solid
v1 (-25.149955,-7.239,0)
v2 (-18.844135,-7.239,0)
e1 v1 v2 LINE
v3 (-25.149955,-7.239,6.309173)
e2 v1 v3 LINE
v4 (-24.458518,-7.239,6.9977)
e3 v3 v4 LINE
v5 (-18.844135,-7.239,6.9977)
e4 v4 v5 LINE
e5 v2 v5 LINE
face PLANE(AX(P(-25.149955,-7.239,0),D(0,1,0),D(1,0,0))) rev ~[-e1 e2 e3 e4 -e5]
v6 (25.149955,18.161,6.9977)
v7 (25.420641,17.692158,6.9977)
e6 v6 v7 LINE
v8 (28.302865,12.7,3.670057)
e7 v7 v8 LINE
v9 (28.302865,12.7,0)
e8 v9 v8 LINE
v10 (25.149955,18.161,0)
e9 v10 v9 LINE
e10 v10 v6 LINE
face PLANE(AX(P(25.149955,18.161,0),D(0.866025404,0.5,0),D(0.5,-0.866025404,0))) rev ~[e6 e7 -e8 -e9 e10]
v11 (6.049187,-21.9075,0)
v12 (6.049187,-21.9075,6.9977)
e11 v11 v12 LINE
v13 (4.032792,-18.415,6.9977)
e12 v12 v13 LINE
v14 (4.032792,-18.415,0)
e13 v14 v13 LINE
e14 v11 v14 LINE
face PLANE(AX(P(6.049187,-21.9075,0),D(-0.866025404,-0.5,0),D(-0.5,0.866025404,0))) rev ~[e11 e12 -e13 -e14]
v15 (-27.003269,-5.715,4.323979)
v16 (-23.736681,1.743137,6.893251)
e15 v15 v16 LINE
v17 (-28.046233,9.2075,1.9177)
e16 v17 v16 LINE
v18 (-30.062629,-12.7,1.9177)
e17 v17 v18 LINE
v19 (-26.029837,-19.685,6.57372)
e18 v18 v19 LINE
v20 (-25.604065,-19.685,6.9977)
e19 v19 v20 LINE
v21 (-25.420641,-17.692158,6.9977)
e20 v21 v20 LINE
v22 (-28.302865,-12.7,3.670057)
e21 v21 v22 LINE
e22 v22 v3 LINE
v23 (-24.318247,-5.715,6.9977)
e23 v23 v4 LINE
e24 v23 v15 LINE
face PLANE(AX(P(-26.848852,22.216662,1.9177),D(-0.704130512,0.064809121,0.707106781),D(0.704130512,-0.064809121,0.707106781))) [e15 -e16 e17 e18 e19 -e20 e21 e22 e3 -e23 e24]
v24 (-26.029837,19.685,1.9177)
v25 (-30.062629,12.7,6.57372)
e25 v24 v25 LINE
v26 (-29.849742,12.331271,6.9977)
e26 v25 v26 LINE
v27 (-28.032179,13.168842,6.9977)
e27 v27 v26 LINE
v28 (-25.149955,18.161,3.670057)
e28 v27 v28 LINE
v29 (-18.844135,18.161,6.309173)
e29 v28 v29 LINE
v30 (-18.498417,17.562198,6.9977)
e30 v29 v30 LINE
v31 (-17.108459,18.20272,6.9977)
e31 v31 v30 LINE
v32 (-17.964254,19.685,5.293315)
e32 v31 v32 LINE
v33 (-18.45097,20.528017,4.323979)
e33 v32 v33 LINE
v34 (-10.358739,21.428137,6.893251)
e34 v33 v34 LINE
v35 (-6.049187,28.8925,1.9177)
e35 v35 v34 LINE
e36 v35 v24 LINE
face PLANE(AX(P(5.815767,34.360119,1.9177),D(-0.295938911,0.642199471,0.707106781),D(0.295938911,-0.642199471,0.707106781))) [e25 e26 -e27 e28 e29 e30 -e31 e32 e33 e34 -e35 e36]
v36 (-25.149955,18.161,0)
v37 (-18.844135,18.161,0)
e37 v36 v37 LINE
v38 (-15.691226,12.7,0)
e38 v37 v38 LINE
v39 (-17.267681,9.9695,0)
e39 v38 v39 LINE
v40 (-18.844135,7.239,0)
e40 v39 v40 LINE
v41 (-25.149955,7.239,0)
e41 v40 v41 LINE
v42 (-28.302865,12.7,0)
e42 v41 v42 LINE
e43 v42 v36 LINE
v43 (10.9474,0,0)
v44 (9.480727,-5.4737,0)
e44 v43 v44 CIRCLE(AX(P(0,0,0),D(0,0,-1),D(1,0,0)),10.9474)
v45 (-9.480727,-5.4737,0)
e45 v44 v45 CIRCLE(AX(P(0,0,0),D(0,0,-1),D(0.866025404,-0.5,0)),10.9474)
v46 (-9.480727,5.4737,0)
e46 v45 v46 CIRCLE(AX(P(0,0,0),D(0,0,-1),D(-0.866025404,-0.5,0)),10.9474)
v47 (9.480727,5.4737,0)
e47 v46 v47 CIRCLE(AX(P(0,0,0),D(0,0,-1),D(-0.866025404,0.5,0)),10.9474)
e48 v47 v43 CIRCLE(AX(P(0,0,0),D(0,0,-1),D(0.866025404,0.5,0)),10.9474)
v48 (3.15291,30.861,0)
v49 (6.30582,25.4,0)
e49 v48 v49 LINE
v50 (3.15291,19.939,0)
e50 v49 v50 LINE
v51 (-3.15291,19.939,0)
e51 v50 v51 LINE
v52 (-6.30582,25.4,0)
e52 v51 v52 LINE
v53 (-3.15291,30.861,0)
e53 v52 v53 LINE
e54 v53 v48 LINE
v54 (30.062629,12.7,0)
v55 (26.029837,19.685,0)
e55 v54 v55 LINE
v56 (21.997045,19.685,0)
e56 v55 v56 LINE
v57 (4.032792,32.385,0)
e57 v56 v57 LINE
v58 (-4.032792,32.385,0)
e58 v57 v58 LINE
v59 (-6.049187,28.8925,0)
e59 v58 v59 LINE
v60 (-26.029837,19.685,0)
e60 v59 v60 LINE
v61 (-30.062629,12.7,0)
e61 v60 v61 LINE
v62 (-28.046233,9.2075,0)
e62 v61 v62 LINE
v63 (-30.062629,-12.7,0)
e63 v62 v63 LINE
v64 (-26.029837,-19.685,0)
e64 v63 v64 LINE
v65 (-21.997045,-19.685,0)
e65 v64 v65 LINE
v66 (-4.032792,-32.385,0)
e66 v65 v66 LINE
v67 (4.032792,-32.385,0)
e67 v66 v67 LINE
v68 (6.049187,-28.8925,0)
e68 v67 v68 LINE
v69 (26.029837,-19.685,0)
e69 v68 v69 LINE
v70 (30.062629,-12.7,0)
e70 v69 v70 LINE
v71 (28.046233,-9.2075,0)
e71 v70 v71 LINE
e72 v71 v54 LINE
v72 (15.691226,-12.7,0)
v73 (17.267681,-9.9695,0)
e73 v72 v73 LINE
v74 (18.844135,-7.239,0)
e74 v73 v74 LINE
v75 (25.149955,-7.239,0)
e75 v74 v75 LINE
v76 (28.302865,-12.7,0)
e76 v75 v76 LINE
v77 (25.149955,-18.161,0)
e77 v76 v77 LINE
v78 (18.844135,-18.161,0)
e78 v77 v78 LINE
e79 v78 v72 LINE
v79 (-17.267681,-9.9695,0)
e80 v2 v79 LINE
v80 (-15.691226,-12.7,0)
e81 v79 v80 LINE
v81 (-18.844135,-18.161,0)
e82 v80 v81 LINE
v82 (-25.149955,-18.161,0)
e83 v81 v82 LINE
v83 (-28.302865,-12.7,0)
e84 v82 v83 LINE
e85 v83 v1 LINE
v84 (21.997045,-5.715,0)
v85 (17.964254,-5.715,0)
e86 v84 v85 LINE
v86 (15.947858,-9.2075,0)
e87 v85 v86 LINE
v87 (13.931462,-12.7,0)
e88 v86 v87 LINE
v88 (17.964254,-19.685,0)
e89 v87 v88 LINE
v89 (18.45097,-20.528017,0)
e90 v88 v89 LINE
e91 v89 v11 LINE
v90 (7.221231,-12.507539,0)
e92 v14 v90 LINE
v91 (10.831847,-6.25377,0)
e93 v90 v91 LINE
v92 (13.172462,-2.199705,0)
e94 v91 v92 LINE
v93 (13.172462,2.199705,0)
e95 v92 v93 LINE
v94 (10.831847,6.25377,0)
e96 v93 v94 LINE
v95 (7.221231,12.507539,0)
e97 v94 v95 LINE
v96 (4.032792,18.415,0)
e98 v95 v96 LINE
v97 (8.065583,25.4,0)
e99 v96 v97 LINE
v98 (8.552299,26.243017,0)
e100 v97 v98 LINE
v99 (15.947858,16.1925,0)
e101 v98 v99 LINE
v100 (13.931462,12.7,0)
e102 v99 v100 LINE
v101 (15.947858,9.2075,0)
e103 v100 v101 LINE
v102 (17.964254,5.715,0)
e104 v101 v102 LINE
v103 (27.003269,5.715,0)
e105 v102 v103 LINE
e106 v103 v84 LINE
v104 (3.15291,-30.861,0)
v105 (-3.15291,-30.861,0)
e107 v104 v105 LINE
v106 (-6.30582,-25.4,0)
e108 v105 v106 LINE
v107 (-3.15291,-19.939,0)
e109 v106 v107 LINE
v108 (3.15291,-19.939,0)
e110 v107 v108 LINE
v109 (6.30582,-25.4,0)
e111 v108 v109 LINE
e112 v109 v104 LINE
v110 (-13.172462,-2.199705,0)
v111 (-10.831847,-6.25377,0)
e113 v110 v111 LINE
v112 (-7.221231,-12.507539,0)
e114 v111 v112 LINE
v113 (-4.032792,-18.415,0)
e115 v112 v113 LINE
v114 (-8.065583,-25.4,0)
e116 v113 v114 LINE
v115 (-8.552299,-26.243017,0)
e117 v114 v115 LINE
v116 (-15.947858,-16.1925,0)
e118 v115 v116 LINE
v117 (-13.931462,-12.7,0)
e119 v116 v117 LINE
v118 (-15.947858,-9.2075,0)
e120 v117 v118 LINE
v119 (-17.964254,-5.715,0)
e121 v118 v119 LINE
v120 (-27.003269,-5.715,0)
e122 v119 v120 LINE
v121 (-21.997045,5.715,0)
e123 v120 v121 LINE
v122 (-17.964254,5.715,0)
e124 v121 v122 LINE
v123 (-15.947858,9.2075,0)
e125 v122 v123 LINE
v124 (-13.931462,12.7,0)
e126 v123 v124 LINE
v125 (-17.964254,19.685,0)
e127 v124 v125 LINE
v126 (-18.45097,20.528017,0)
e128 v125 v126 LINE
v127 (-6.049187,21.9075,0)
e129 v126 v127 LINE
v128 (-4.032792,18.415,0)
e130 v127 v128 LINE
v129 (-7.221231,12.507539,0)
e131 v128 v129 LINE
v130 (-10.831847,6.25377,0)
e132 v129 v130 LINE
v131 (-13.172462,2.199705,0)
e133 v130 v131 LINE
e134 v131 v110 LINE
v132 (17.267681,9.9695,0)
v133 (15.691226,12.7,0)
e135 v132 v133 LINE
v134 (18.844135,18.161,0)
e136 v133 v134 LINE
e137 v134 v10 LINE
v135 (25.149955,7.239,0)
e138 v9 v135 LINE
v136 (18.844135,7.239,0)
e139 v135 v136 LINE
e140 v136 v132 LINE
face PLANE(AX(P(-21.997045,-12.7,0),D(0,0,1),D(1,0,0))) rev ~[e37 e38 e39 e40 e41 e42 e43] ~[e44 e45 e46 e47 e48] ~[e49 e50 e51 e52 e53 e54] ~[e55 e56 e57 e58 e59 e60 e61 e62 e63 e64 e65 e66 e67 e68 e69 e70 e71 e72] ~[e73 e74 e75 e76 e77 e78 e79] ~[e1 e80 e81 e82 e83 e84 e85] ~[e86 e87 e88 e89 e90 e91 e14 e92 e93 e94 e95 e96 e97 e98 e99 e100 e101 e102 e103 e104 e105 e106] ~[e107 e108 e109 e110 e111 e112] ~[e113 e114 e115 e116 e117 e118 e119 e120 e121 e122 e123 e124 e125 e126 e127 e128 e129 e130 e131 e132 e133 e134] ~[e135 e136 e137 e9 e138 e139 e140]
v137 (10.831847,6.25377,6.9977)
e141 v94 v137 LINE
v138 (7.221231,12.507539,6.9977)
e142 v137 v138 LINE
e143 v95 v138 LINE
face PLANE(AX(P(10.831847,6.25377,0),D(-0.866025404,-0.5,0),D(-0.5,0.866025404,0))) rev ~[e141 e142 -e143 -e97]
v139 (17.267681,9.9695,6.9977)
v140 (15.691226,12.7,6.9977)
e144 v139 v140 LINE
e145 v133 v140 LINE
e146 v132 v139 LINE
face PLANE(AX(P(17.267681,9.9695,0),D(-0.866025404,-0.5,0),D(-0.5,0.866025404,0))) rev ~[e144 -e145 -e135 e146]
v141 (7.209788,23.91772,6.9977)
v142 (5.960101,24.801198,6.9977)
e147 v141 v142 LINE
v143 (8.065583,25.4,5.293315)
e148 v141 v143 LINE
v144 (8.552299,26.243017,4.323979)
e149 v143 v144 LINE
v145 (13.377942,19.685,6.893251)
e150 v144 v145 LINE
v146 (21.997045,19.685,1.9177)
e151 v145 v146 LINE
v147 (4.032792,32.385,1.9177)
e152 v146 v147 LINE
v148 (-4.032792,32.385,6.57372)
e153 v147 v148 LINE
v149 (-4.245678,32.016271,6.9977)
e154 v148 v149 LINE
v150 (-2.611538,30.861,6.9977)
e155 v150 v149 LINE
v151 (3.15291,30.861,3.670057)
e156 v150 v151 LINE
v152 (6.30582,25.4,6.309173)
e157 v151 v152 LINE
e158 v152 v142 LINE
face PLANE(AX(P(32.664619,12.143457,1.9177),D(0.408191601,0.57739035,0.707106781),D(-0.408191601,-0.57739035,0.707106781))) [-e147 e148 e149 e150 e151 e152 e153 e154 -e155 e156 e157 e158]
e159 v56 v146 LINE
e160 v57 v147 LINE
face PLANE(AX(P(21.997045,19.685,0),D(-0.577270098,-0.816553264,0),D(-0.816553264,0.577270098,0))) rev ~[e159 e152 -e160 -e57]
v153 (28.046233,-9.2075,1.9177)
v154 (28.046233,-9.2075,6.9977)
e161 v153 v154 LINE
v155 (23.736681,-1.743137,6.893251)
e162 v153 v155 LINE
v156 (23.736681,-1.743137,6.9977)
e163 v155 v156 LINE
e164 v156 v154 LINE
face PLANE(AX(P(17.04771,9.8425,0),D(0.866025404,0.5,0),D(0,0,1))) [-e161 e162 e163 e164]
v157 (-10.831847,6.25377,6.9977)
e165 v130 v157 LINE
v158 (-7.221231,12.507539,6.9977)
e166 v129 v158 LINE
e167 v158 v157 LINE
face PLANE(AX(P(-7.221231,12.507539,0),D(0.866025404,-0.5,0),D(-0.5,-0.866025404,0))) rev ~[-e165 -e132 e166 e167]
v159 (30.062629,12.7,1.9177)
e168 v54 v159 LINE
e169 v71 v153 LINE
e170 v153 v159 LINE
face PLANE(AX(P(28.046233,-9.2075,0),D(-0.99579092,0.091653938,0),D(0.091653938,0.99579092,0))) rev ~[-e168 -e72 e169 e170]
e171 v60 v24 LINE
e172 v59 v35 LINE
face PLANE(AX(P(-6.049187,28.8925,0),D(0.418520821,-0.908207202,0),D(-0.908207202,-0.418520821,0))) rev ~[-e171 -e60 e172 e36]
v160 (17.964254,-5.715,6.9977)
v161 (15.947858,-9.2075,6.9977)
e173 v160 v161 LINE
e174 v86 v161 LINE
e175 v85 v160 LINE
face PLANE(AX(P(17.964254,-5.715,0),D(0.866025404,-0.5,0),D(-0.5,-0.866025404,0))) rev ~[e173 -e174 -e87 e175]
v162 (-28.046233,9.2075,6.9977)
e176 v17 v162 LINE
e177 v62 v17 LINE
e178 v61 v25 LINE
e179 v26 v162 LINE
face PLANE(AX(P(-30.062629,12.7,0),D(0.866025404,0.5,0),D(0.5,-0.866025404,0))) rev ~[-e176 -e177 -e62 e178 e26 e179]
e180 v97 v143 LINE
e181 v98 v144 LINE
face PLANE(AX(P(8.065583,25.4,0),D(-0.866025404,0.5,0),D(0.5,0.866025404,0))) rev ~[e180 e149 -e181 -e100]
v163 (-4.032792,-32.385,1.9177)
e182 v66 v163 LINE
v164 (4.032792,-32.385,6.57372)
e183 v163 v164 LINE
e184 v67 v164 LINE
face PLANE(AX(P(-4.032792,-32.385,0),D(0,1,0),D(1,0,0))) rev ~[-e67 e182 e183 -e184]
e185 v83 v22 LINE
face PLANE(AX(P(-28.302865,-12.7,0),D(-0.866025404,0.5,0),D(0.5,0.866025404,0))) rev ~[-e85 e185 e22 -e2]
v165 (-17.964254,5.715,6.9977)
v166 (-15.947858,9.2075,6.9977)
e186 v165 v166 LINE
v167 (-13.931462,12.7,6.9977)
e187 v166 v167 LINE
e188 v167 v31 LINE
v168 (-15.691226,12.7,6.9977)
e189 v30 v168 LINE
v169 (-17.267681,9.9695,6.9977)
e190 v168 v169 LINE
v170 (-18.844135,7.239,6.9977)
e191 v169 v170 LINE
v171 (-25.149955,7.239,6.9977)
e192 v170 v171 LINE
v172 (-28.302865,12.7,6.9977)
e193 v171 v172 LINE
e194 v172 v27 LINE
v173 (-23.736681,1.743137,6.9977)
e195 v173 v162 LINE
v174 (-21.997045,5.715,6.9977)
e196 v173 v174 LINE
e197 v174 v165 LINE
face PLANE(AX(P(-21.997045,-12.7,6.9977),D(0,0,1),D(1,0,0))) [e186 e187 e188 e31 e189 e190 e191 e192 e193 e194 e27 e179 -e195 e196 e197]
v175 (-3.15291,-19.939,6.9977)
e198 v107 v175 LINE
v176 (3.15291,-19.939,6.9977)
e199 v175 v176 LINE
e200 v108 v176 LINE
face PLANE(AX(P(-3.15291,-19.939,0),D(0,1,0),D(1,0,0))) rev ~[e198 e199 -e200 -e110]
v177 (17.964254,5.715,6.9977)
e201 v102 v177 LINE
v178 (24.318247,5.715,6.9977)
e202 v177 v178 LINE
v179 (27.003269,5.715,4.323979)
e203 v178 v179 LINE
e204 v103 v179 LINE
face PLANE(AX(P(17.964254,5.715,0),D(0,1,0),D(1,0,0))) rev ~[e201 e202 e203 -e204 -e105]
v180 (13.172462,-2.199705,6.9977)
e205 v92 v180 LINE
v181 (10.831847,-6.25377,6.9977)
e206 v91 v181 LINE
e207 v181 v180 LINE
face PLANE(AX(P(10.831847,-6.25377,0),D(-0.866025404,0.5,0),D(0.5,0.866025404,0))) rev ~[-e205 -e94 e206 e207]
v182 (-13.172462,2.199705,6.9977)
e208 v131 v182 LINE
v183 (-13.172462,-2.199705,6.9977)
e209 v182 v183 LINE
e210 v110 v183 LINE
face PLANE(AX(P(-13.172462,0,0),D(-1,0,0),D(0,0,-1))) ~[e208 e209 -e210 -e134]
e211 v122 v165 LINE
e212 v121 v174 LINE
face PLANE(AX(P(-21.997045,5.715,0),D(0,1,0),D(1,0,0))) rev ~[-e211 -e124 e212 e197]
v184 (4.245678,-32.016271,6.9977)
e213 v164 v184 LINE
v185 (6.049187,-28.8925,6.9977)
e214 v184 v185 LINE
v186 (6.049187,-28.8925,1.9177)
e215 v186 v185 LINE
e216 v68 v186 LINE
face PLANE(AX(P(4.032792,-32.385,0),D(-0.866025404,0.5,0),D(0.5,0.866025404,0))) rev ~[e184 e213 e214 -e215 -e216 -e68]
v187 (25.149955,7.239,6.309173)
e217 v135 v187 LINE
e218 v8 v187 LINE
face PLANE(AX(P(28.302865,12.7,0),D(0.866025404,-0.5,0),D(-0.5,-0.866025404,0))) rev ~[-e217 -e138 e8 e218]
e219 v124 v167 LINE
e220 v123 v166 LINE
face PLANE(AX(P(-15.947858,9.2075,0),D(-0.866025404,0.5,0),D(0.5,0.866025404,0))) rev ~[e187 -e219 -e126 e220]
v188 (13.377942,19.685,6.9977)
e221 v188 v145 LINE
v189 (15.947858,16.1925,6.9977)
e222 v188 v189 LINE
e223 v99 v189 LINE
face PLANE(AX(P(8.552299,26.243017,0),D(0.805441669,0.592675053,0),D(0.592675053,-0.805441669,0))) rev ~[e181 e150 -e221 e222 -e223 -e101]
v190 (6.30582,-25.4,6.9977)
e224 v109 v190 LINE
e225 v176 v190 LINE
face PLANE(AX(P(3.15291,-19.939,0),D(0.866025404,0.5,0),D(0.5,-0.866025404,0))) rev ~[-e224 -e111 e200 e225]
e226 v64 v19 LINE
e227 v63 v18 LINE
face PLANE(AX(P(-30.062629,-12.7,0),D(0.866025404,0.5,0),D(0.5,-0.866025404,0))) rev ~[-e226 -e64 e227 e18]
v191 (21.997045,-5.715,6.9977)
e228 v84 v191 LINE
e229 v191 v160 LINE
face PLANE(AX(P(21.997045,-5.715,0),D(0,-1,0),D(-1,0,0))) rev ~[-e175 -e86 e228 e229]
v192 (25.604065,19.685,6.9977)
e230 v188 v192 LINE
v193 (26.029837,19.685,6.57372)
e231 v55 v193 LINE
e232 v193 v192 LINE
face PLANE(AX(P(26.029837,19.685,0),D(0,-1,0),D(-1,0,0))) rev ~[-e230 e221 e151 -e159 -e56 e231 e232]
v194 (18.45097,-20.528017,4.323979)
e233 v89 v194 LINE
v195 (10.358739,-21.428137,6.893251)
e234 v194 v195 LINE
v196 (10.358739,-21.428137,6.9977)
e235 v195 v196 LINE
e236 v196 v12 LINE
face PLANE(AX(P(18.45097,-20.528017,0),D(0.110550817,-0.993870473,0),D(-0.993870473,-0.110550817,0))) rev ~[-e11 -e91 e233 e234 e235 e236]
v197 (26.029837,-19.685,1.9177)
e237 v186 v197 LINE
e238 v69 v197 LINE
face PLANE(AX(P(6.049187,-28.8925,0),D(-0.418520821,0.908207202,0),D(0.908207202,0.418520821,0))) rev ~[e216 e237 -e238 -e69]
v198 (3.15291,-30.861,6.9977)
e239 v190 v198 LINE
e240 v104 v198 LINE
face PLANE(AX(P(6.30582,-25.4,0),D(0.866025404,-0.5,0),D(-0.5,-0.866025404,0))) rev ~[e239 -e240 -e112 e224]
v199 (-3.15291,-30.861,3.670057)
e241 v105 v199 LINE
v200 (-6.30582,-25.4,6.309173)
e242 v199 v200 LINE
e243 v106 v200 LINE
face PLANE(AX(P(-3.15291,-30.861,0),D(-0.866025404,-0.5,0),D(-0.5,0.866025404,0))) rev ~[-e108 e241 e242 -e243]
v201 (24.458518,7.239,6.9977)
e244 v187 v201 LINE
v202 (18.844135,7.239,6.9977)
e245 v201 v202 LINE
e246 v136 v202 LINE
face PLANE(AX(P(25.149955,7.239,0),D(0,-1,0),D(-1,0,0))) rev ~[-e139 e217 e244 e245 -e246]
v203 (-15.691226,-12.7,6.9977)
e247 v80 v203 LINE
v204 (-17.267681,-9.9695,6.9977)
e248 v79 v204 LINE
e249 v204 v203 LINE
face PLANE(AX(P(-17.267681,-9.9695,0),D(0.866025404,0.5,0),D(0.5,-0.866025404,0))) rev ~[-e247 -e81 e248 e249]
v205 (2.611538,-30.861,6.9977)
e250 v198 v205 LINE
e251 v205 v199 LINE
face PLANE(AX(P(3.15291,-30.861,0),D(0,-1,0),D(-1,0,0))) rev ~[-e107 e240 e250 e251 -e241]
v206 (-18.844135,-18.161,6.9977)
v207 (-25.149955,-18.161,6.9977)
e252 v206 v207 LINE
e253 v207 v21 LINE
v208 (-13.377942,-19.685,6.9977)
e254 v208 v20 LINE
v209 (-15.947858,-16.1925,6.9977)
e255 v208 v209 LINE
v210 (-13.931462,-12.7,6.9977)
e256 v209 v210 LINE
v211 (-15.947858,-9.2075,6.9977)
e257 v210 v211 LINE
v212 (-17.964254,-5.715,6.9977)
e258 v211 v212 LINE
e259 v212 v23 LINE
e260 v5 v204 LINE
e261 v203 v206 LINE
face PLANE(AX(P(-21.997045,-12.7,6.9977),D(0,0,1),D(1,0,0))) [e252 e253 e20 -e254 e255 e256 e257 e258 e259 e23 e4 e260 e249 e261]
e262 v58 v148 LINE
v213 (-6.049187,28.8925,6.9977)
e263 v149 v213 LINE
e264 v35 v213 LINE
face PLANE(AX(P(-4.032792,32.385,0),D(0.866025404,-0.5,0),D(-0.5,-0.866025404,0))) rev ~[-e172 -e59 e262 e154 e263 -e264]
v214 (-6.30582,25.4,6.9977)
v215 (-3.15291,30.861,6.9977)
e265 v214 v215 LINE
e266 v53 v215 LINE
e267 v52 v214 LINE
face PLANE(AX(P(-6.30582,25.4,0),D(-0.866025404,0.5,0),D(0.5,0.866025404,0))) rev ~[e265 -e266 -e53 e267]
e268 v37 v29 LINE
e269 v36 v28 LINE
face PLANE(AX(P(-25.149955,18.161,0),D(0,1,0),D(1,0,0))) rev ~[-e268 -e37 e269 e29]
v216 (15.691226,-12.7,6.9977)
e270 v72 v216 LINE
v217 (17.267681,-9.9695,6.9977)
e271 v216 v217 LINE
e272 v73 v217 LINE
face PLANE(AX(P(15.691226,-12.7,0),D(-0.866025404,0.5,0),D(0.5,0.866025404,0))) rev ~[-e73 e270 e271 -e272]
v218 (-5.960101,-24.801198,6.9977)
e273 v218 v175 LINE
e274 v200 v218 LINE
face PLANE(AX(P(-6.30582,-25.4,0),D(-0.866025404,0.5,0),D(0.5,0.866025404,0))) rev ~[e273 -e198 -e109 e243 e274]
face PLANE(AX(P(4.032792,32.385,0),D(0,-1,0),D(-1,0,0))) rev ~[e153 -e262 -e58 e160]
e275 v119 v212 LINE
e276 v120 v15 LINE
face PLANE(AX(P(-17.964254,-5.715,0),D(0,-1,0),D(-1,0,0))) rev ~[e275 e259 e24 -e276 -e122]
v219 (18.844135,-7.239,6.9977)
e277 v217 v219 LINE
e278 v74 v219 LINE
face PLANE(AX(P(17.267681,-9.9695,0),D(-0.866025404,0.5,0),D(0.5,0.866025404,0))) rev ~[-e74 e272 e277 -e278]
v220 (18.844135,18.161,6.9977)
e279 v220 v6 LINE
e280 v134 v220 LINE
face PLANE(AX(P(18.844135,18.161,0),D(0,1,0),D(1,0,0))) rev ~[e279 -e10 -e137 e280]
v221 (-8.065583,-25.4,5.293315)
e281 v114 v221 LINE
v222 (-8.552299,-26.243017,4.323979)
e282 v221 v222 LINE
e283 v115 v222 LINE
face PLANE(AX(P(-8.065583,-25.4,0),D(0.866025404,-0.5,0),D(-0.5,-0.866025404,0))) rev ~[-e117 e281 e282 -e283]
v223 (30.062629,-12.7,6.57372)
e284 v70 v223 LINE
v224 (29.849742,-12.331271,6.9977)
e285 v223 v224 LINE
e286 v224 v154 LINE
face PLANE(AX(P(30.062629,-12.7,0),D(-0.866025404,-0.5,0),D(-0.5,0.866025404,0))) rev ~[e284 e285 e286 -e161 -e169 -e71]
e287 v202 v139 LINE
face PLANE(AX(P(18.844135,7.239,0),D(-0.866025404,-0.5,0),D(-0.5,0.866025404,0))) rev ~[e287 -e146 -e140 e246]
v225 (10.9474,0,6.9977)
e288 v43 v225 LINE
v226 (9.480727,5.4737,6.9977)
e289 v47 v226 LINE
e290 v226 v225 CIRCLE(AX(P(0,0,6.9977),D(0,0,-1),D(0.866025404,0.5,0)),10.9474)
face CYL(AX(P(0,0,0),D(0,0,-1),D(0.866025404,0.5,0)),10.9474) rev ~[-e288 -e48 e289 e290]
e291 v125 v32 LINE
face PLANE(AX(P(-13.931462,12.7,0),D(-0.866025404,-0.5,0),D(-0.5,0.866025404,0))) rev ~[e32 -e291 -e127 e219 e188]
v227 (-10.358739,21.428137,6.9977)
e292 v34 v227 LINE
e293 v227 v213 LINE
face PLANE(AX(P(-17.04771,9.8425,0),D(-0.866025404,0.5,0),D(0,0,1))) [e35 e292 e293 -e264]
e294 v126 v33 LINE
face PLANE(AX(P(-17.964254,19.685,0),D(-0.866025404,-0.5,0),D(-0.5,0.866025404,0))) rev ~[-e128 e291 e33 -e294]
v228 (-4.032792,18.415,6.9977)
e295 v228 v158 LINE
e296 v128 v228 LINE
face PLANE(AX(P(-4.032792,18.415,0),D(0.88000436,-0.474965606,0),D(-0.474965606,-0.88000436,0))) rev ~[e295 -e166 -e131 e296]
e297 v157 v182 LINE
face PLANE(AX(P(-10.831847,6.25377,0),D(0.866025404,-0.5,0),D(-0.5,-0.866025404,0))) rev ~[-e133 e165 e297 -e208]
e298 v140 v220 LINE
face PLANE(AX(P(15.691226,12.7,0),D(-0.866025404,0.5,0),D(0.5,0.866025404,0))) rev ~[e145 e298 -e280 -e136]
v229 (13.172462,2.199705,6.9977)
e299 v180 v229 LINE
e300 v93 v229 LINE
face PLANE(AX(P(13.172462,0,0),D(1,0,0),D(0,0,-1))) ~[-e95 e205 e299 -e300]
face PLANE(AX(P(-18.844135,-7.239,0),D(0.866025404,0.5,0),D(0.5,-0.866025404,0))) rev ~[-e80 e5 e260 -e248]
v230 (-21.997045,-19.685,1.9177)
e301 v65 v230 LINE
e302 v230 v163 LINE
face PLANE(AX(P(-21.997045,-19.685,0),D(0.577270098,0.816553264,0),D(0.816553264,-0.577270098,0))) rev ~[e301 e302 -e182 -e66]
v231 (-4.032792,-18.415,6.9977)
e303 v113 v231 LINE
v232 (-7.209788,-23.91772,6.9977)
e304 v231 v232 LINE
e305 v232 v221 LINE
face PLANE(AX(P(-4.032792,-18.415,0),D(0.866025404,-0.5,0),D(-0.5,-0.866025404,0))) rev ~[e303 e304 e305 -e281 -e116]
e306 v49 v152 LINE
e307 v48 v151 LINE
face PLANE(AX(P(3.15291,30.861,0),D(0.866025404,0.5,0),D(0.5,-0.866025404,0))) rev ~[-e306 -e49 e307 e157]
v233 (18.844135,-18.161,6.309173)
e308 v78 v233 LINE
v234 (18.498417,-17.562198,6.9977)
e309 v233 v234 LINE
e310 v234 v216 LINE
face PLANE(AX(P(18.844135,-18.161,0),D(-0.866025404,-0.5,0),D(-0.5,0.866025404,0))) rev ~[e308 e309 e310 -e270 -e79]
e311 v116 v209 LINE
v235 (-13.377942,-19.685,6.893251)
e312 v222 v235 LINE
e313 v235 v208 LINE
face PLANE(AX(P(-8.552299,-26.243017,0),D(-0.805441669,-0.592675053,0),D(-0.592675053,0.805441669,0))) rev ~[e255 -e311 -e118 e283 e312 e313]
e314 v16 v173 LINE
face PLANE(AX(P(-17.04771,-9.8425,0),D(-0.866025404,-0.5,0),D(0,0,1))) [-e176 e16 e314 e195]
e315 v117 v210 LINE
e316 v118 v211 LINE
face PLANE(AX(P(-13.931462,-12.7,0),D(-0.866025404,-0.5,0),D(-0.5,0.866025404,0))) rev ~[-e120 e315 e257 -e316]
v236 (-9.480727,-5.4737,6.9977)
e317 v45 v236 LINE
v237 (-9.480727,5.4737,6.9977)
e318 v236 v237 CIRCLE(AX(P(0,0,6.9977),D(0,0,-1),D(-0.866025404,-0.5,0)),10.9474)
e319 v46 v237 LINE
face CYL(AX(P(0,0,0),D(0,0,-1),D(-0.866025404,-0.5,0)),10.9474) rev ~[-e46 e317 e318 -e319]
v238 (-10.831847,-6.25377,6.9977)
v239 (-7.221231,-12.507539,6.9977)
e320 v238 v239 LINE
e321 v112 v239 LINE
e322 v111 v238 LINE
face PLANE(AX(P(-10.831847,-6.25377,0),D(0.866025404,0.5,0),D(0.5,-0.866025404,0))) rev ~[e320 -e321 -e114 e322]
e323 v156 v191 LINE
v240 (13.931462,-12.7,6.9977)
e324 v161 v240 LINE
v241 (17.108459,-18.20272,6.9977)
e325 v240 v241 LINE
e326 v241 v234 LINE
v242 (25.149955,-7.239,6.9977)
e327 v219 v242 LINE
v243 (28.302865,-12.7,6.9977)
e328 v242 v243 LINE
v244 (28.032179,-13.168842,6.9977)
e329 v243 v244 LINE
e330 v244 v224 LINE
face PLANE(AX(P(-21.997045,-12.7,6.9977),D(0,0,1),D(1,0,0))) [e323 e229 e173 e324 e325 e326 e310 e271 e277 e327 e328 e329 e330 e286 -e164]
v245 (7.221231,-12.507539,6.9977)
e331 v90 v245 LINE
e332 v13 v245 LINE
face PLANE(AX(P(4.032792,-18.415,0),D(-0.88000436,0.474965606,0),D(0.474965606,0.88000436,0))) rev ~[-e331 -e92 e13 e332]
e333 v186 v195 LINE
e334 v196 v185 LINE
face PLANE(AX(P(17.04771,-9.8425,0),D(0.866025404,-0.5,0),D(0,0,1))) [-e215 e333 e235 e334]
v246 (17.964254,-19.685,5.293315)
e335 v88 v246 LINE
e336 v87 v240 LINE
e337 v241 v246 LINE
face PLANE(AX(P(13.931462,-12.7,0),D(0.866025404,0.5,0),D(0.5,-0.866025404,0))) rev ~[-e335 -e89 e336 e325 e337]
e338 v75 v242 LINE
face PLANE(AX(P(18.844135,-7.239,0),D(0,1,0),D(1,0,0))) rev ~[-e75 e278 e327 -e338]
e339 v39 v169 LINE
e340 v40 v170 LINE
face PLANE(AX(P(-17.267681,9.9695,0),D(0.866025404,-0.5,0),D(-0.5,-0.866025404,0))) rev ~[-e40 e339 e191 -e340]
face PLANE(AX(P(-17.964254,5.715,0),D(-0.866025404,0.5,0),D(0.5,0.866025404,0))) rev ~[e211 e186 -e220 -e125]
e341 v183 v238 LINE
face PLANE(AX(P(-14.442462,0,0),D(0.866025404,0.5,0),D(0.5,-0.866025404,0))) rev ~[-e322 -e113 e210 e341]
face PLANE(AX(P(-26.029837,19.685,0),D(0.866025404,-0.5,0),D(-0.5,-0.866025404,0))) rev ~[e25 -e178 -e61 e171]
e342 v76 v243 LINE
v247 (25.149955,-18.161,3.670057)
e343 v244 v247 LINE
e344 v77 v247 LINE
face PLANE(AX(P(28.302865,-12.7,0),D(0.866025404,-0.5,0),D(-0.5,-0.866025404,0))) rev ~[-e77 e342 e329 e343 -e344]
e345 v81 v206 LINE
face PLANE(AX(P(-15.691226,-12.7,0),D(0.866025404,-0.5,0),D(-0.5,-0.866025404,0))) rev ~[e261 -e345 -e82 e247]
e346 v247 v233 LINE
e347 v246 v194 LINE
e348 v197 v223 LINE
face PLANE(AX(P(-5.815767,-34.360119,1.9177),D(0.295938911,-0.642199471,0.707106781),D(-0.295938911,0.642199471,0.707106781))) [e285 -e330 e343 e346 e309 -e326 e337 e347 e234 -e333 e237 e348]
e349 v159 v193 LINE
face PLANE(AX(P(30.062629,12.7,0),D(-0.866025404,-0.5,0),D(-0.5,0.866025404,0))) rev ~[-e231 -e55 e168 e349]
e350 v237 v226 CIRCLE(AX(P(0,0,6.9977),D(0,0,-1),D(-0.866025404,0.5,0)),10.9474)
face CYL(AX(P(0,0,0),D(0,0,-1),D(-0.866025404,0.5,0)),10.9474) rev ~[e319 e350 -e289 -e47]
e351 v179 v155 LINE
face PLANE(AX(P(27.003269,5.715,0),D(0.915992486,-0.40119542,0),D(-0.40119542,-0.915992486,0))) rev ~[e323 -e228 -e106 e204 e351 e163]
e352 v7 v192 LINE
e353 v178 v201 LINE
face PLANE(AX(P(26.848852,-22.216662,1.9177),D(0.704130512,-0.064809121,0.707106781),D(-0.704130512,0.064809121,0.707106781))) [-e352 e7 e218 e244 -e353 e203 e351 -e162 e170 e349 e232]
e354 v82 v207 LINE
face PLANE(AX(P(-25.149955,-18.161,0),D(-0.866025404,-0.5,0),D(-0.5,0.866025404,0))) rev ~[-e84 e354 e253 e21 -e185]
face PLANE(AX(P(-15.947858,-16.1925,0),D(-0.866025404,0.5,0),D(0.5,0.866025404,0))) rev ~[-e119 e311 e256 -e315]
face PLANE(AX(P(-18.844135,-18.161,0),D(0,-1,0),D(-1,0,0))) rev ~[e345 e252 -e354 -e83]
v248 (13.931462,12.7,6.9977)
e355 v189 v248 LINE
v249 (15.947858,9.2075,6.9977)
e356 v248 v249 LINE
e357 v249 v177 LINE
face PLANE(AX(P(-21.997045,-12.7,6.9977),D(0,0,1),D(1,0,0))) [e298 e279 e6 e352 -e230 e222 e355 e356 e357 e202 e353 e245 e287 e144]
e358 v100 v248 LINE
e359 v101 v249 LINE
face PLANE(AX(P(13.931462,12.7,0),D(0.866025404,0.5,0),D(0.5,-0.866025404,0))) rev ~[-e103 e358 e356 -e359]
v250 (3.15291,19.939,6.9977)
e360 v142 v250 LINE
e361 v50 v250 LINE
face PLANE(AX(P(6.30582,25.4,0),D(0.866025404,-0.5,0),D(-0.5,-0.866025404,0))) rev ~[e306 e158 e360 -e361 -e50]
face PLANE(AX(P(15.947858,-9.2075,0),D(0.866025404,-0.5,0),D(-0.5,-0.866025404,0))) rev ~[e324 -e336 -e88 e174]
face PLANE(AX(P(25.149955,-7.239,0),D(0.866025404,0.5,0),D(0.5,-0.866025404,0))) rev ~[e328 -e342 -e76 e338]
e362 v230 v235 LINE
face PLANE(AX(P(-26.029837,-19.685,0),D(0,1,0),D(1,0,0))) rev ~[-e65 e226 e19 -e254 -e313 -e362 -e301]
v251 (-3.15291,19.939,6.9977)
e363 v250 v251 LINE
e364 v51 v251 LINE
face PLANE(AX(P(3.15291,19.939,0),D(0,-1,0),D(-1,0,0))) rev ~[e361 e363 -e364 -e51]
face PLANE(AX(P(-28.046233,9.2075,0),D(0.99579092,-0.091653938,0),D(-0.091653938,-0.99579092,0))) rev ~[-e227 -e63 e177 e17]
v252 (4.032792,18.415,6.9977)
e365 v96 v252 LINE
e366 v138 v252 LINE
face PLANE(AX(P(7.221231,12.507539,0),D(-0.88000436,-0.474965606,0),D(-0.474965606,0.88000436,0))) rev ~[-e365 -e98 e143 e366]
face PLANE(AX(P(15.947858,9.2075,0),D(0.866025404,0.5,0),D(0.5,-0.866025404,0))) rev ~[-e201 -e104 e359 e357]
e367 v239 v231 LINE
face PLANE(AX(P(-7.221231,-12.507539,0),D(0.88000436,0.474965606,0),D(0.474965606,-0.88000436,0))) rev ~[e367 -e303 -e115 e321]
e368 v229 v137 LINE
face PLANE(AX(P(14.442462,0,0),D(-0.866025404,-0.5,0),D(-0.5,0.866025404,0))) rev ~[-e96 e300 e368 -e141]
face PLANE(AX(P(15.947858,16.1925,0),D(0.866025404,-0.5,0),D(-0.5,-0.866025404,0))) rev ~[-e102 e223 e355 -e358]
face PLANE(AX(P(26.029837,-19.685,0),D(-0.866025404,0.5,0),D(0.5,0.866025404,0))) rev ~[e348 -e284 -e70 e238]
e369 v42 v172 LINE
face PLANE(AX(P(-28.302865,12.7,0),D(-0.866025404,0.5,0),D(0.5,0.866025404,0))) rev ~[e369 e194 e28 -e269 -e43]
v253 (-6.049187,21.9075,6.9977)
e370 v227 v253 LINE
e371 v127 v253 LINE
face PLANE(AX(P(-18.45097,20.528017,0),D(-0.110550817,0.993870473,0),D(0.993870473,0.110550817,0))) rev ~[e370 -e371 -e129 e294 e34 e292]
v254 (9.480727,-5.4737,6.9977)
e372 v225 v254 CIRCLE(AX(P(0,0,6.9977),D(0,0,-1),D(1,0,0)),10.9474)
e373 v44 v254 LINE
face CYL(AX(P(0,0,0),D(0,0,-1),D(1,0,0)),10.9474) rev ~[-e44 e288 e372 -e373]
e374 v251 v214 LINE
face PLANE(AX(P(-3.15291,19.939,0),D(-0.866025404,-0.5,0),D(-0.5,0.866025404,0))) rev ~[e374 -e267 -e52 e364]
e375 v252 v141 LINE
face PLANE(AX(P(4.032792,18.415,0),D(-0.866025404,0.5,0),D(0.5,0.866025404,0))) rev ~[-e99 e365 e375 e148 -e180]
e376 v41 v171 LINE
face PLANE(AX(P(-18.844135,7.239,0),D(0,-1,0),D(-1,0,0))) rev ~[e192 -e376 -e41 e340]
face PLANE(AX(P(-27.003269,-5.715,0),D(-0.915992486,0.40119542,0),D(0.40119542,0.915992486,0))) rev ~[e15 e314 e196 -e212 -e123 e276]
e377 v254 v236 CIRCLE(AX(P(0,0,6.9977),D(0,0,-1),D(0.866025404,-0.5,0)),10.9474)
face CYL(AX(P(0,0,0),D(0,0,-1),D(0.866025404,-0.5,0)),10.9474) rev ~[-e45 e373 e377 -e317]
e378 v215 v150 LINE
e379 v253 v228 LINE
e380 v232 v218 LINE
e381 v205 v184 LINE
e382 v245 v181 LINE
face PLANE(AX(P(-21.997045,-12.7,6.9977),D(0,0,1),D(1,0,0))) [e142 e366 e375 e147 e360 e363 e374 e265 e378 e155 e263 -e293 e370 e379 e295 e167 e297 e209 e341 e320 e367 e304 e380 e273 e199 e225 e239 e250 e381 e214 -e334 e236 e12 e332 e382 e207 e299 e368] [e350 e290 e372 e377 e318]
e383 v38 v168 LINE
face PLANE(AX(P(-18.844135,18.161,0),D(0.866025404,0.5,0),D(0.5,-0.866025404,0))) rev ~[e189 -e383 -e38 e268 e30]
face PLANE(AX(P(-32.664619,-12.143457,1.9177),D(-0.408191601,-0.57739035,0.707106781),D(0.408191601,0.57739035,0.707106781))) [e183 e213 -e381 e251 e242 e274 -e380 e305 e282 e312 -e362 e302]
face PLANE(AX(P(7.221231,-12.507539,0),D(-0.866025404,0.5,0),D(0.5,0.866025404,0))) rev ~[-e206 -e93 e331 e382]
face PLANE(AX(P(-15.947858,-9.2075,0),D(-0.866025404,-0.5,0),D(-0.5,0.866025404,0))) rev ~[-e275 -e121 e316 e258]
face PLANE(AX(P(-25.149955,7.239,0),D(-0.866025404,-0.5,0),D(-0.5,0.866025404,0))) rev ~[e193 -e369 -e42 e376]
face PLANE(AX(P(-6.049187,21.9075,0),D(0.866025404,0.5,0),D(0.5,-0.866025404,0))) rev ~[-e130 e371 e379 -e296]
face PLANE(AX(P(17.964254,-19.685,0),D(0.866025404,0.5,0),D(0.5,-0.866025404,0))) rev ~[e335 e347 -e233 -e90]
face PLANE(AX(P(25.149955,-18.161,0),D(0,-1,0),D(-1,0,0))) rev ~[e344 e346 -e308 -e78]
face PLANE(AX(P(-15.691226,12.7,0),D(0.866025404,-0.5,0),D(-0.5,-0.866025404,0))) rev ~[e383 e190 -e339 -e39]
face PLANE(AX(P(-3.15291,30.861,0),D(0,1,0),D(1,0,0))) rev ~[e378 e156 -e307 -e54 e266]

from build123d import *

# Parameters (mm, degrees)
F1_DEPTH     = 6.9977
F2_T4_DEPTH  = 48.1283993469
F2_T9_DEPTH  = 48.1283993469
F2_T14_DEPTH = 48.1283993469
F2_T19_DEPTH = 48.1283993469
F2_T24_DEPTH = 48.1283993469
F2_T29_DEPTH = 48.1283993469
F3_SIZE      = 2.54


# Not quite as in the source:
# - a fillet or chamfer that OpenCascade refuses, or shapes differently, is made with other operations: its cross-section is extruded or revolved along the edge and cut away or added
# - a feature names something its author has since deleted; it is built from what else it names


with BuildPart() as f1:
    # F0 (on Top) → F1 (new body)
    with BuildSketch(Plane.XY):
        Polygon((-13.9314619955, -12.7), (-15.9478578107, -9.2075), (-17.9642536258, -5.715), (-26.0298368864, -5.715), (-30.0626285167, -12.7), (-26.0298368864, -19.685), (-21.9970452561, -19.685), (-17.9642536258, -19.685), (-15.9478578107, -16.1925), align=None)
        Polygon((-18.8441354361, -7.239), (-17.2676805261, -9.9695), (-15.691225616, -12.7), (-18.8441354361, -18.161), (-25.1499550762, -18.161), (-28.3028648962, -12.7), (-25.1499550762, -7.239), align=None, mode=Mode.SUBTRACT)
        with BuildLine():
            ThreePointArc((-9.4807265054, -5.4737), (-10.9474, 0), (-9.4807265054, 5.4737))
            Line((-9.4807265054, 5.4737), (-10.8318467228, 6.2537696213))
            Line((-10.8318467228, 6.2537696213), (-14.4424622971, 0))
            Line((-14.4424622971, 0), (-10.8318467228, -6.2537696213))
            Line((-10.8318467228, -6.2537696213), (-9.4807265054, -5.4737))
        make_face()
        Polygon((-17.9642536258, 5.715), (-15.9478578107, 9.2075), (-13.9314619955, 12.7), (-17.9642536258, 19.685), (-26.0298368864, 19.685), (-30.0626285167, 12.7), (-28.0462327016, 9.2075), (-26.0298368864, 5.715), (-21.9970452561, 5.715), align=None)
        Polygon((-15.691225616, 12.7), (-17.2676805261, 9.9695), (-18.8441354361, 7.239), (-25.1499550762, 7.239), (-28.3028648962, 12.7), (-25.1499550762, 18.161), (-18.8441354361, 18.161), align=None, mode=Mode.SUBTRACT)
        Polygon((-27.0032693489, -5.715), (-21.9970452561, 5.715), (-26.0298368864, 5.715), (-28.0462327016, 9.2075), (-30.0626285167, -12.7), align=None)
        Polygon((-18.4509698571, 20.5280172414), (-6.0491874454, 21.9075), (-8.0655832606, 25.4), (-6.0491874454, 28.8925), (-26.0298368864, 19.685), align=None)
        Polygon((-4.0327916303, 18.415), (4.0327916303, 18.415), (8.0655832606, 25.4), (4.0327916303, 32.385), (-4.0327916303, 32.385), (-6.0491874454, 28.8925), (-8.0655832606, 25.4), (-6.0491874454, 21.9075), align=None)
        Polygon((-6.3058196401, 25.4), (-3.15290982, 30.861), (3.15290982, 30.861), (6.3058196401, 25.4), (3.15290982, 19.939), (-3.15290982, 19.939), align=None, mode=Mode.SUBTRACT)
        Polygon((8.5522994918, 26.2430172414), (15.9478578107, 16.1925), (17.9642536258, 19.685), (21.9970452561, 19.685), (4.0327916303, 32.385), align=None)
        Polygon((27.0032693489, 5.715), (21.9970452561, -5.715), (26.0298368864, -5.715), (28.0462327016, -9.2075), (30.0626285167, 12.7), align=None)
        Polygon((13.9314619955, 12.7), (15.9478578107, 9.2075), (17.9642536258, 5.715), (26.0298368864, 5.715), (30.0626285167, 12.7), (26.0298368864, 19.685), (21.9970452561, 19.685), (17.9642536258, 19.685), (15.9478578107, 16.1925), align=None)
        Polygon((18.8441354361, 7.239), (17.2676805261, 9.9695), (15.691225616, 12.7), (18.8441354361, 18.161), (25.1499550762, 18.161), (28.3028648962, 12.7), (25.1499550762, 7.239), align=None, mode=Mode.SUBTRACT)
        Polygon((18.4509698571, -20.5280172414), (6.0491874454, -21.9075), (8.0655832606, -25.4), (6.0491874454, -28.8925), (26.0298368864, -19.685), align=None)
        Polygon((6.0491874454, -21.9075), (4.0327916303, -18.415), (-4.0327916303, -18.415), (-8.0655832606, -25.4), (-4.0327916303, -32.385), (4.0327916303, -32.385), (6.0491874454, -28.8925), (8.0655832606, -25.4), align=None)
        Polygon((-6.3058196401, -25.4), (-3.15290982, -19.939), (3.15290982, -19.939), (6.3058196401, -25.4), (3.15290982, -30.861), (-3.15290982, -30.861), align=None, mode=Mode.SUBTRACT)
        Polygon((-8.5522994918, -26.2430172414), (-15.9478578107, -16.1925), (-17.9642536258, -19.685), (-21.9970452561, -19.685), (-4.0327916303, -32.385), align=None)
        with BuildLine():
            Line((10.8318467228, -6.2537696213), (9.4807265054, -5.4737))
            ThreePointArc((9.4807265054, -5.4737), (0, -10.9474), (-9.4807265054, -5.4737))
            Line((-9.4807265054, -5.4737), (-10.8318467228, -6.2537696213))
            Line((-10.8318467228, -6.2537696213), (-7.2212311486, -12.5075392425))
            Line((-7.2212311486, -12.5075392425), (7.2212311486, -12.5075392425))
            Line((7.2212311486, -12.5075392425), (10.8318467228, -6.2537696213))
        make_face()
        with BuildLine():
            ThreePointArc((9.4807265054, 5.4737), (10.5743763907, 2.8333956144), (10.9474, 0))
            ThreePointArc((10.9474, 0), (10.5743763907, -2.8333956144), (9.4807265054, -5.4737))
            Line((9.4807265054, -5.4737), (10.8318467228, -6.2537696213))
            Line((10.8318467228, -6.2537696213), (14.4424622971, 0))
            Line((14.4424622971, 0), (10.8318467228, 6.2537696213))
            Line((10.8318467228, 6.2537696213), (9.4807265054, 5.4737))
        make_face()
        with BuildLine():
            ThreePointArc((-9.4807265054, 5.4737), (0, 10.9474), (9.4807265054, 5.4737))
            Line((9.4807265054, 5.4737), (10.8318467228, 6.2537696213))
            Line((10.8318467228, 6.2537696213), (7.2212311486, 12.5075392425))
            Line((7.2212311486, 12.5075392425), (-7.2212311486, 12.5075392425))
            Line((-7.2212311486, 12.5075392425), (-10.8318467228, 6.2537696213))
            Line((-10.8318467228, 6.2537696213), (-9.4807265054, 5.4737))
        make_face()
        Polygon((17.9642536258, -5.715), (15.9478578107, -9.2075), (13.9314619955, -12.7), (17.9642536258, -19.685), (26.0298368864, -19.685), (30.0626285167, -12.7), (28.0462327016, -9.2075), (26.0298368864, -5.715), (21.9970452561, -5.715), align=None)
        Polygon((15.691225616, -12.7), (17.2676805261, -9.9695), (18.8441354361, -7.239), (25.1499550762, -7.239), (28.3028648962, -12.7), (25.1499550762, -18.161), (18.8441354361, -18.161), align=None, mode=Mode.SUBTRACT)
        Polygon((-26.0298368864, 19.685), (-17.9642536258, 19.685), (-18.4509698571, 20.5280172414), align=None)
        Polygon((30.0626285167, 12.7), (26.0298368864, 5.715), (27.0032693489, 5.715), align=None)
        Polygon((26.0298368864, -19.685), (17.9642536258, -19.685), (18.4509698571, -20.5280172414), align=None)
        Polygon((-30.0626285167, -12.7), (-26.0298368864, -5.715), (-27.0032693489, -5.715), align=None)
        Polygon((-7.2212311486, 12.5075392425), (7.2212311486, 12.5075392425), (4.0327916303, 18.415), (-4.0327916303, 18.415), align=None)
        Polygon((4.0327916303, -18.415), (7.2212311486, -12.5075392425), (-7.2212311486, -12.5075392425), (-4.0327916303, -18.415), align=None)
        Polygon((-4.0327916303, -32.385), (-8.0655832606, -25.4), (-8.5522994918, -26.2430172414), align=None)
        Polygon((4.0327916303, 32.385), (8.0655832606, 25.4), (8.5522994918, 26.2430172414), align=None)
    extrude(amount=F1_DEPTH)

    # F2: chamfer of 5.08 on 6 edges, made by hand


with BuildPart() as f2_tool2:
    # F2_s3 → F2_t4 (new body)
    with BuildSketch(Plane(origin=(-1.8021315116, -19.5795864057, 0), x_dir=(0, 0, 1), z_dir=(0.0916539378, 0.9957909197, 0))):
        Polygon((1.9177, 28.7720874875), (6.9977, 23.6920874875), (6.9977, 28.7720874875), align=None)
    extrude(amount=F2_T4_DEPTH)

    split(bisect_by=Plane(origin=(17.0477100735, 9.8425, 0), x_dir=(0, 0, 1), z_dir=(0.8660254038, 0.5, 0)), keep=Keep.TOP)


with BuildPart() as f1_1:
    add(f1.part)

    # F2_t1: cut F2_tool2
    add(f2_tool2.part, mode=Mode.SUBTRACT)


with BuildPart() as f2_tool7:
    # F2_s8 → F2_t9 (new body)
    with BuildSketch(Plane(origin=(16.0553534671, -11.3504848729, 0), x_dir=(0, 0, 1), z_dir=(-0.8165532644, 0.5772700984, 0))):
        Polygon((1.9177, 28.7720874875), (6.9977, 23.6920874875), (6.9977, 28.7720874875), align=None)
    extrude(amount=F2_T9_DEPTH)

    split(bisect_by=Plane.XZ.offset(-19.685), keep=Keep.BOTTOM)


with BuildPart() as f1_2:
    add(f1_1.part)

    # F2_t6: cut F2_tool7
    add(f2_tool7.part, mode=Mode.SUBTRACT)


with BuildPart() as f2_tool12:
    # F2_s13 → F2_t14 (new body)
    with BuildSketch(Plane(origin=(17.8574849787, 8.2291015328, 0), x_dir=(0, 0, 1), z_dir=(-0.9082072022, -0.4185208213, 0))):
        Polygon((1.9177, 28.7720874875), (6.9977, 23.6920874875), (6.9977, 28.7720874875), align=None)
    extrude(amount=F2_T14_DEPTH)

    split(bisect_by=Plane(origin=(-17.0477100735, 9.8425, 0), x_dir=(0, 0, 1), z_dir=(-0.8660254038, 0.5, 0)), keep=Keep.TOP)


with BuildPart() as f1_3:
    add(f1_2.part)

    # F2_t11: cut F2_tool12
    add(f2_tool12.part, mode=Mode.SUBTRACT)


with BuildPart() as f2_tool17:
    # F2_s18 → F2_t19 (new body)
    with BuildSketch(Plane(origin=(1.8021315116, 19.5795864057, 0), x_dir=(0, 0, 1), z_dir=(-0.0916539378, -0.9957909197, 0))):
        Polygon((1.9177, 28.7720874875), (6.9977, 23.6920874875), (6.9977, 28.7720874875), align=None)
    extrude(amount=F2_T19_DEPTH)

    split(bisect_by=Plane(origin=(-17.0477100735, -9.8425, 0), x_dir=(0, 0, 1), z_dir=(-0.8660254038, -0.5, 0)), keep=Keep.TOP)


with BuildPart() as f1_4:
    add(f1_3.part)

    # F2_t16: cut F2_tool17
    add(f2_tool17.part, mode=Mode.SUBTRACT)


with BuildPart() as f2_tool22:
    # F2_s23 → F2_t24 (new body)
    with BuildSketch(Plane(origin=(-16.0553534671, 11.3504848729, 0), x_dir=(0, 0, 1), z_dir=(0.8165532644, -0.5772700984, 0))):
        Polygon((1.9177, 28.7720874875), (6.9977, 23.6920874875), (6.9977, 28.7720874875), align=None)
    extrude(amount=F2_T24_DEPTH)

    split(bisect_by=Plane.XZ.offset(19.685), keep=Keep.TOP)


with BuildPart() as f1_5:
    add(f1_4.part)

    # F2_t21: cut F2_tool22
    add(f2_tool22.part, mode=Mode.SUBTRACT)


with BuildPart() as f2_tool27:
    # F2_s28 → F2_t29 (new body)
    with BuildSketch(Plane(origin=(-17.8574849787, -8.2291015328, 0), x_dir=(0, 0, 1), z_dir=(0.9082072022, 0.4185208213, 0))):
        Polygon((1.9177, 28.7720874875), (6.9977, 23.6920874875), (6.9977, 28.7720874875), align=None)
    extrude(amount=F2_T29_DEPTH)

    split(bisect_by=Plane(origin=(17.0477100735, -9.8425, 0), x_dir=(0, 0, 1), z_dir=(0.8660254038, -0.5, 0)), keep=Keep.TOP)


with BuildPart() as f1_6:
    add(f1_5.part)

    # F2_t26: cut F2_tool27
    add(f2_tool27.part, mode=Mode.SUBTRACT)

    # F3
    f3_edges = [f1_6.edges().sort_by_distance(p)[0] for p in [
        (-14.442462, 0, 3.49885),
        (14.442462, 0, 3.49885),
    ]]
    chamfer(f3_edges, length=F3_SIZE)


solid = f1_6.part
